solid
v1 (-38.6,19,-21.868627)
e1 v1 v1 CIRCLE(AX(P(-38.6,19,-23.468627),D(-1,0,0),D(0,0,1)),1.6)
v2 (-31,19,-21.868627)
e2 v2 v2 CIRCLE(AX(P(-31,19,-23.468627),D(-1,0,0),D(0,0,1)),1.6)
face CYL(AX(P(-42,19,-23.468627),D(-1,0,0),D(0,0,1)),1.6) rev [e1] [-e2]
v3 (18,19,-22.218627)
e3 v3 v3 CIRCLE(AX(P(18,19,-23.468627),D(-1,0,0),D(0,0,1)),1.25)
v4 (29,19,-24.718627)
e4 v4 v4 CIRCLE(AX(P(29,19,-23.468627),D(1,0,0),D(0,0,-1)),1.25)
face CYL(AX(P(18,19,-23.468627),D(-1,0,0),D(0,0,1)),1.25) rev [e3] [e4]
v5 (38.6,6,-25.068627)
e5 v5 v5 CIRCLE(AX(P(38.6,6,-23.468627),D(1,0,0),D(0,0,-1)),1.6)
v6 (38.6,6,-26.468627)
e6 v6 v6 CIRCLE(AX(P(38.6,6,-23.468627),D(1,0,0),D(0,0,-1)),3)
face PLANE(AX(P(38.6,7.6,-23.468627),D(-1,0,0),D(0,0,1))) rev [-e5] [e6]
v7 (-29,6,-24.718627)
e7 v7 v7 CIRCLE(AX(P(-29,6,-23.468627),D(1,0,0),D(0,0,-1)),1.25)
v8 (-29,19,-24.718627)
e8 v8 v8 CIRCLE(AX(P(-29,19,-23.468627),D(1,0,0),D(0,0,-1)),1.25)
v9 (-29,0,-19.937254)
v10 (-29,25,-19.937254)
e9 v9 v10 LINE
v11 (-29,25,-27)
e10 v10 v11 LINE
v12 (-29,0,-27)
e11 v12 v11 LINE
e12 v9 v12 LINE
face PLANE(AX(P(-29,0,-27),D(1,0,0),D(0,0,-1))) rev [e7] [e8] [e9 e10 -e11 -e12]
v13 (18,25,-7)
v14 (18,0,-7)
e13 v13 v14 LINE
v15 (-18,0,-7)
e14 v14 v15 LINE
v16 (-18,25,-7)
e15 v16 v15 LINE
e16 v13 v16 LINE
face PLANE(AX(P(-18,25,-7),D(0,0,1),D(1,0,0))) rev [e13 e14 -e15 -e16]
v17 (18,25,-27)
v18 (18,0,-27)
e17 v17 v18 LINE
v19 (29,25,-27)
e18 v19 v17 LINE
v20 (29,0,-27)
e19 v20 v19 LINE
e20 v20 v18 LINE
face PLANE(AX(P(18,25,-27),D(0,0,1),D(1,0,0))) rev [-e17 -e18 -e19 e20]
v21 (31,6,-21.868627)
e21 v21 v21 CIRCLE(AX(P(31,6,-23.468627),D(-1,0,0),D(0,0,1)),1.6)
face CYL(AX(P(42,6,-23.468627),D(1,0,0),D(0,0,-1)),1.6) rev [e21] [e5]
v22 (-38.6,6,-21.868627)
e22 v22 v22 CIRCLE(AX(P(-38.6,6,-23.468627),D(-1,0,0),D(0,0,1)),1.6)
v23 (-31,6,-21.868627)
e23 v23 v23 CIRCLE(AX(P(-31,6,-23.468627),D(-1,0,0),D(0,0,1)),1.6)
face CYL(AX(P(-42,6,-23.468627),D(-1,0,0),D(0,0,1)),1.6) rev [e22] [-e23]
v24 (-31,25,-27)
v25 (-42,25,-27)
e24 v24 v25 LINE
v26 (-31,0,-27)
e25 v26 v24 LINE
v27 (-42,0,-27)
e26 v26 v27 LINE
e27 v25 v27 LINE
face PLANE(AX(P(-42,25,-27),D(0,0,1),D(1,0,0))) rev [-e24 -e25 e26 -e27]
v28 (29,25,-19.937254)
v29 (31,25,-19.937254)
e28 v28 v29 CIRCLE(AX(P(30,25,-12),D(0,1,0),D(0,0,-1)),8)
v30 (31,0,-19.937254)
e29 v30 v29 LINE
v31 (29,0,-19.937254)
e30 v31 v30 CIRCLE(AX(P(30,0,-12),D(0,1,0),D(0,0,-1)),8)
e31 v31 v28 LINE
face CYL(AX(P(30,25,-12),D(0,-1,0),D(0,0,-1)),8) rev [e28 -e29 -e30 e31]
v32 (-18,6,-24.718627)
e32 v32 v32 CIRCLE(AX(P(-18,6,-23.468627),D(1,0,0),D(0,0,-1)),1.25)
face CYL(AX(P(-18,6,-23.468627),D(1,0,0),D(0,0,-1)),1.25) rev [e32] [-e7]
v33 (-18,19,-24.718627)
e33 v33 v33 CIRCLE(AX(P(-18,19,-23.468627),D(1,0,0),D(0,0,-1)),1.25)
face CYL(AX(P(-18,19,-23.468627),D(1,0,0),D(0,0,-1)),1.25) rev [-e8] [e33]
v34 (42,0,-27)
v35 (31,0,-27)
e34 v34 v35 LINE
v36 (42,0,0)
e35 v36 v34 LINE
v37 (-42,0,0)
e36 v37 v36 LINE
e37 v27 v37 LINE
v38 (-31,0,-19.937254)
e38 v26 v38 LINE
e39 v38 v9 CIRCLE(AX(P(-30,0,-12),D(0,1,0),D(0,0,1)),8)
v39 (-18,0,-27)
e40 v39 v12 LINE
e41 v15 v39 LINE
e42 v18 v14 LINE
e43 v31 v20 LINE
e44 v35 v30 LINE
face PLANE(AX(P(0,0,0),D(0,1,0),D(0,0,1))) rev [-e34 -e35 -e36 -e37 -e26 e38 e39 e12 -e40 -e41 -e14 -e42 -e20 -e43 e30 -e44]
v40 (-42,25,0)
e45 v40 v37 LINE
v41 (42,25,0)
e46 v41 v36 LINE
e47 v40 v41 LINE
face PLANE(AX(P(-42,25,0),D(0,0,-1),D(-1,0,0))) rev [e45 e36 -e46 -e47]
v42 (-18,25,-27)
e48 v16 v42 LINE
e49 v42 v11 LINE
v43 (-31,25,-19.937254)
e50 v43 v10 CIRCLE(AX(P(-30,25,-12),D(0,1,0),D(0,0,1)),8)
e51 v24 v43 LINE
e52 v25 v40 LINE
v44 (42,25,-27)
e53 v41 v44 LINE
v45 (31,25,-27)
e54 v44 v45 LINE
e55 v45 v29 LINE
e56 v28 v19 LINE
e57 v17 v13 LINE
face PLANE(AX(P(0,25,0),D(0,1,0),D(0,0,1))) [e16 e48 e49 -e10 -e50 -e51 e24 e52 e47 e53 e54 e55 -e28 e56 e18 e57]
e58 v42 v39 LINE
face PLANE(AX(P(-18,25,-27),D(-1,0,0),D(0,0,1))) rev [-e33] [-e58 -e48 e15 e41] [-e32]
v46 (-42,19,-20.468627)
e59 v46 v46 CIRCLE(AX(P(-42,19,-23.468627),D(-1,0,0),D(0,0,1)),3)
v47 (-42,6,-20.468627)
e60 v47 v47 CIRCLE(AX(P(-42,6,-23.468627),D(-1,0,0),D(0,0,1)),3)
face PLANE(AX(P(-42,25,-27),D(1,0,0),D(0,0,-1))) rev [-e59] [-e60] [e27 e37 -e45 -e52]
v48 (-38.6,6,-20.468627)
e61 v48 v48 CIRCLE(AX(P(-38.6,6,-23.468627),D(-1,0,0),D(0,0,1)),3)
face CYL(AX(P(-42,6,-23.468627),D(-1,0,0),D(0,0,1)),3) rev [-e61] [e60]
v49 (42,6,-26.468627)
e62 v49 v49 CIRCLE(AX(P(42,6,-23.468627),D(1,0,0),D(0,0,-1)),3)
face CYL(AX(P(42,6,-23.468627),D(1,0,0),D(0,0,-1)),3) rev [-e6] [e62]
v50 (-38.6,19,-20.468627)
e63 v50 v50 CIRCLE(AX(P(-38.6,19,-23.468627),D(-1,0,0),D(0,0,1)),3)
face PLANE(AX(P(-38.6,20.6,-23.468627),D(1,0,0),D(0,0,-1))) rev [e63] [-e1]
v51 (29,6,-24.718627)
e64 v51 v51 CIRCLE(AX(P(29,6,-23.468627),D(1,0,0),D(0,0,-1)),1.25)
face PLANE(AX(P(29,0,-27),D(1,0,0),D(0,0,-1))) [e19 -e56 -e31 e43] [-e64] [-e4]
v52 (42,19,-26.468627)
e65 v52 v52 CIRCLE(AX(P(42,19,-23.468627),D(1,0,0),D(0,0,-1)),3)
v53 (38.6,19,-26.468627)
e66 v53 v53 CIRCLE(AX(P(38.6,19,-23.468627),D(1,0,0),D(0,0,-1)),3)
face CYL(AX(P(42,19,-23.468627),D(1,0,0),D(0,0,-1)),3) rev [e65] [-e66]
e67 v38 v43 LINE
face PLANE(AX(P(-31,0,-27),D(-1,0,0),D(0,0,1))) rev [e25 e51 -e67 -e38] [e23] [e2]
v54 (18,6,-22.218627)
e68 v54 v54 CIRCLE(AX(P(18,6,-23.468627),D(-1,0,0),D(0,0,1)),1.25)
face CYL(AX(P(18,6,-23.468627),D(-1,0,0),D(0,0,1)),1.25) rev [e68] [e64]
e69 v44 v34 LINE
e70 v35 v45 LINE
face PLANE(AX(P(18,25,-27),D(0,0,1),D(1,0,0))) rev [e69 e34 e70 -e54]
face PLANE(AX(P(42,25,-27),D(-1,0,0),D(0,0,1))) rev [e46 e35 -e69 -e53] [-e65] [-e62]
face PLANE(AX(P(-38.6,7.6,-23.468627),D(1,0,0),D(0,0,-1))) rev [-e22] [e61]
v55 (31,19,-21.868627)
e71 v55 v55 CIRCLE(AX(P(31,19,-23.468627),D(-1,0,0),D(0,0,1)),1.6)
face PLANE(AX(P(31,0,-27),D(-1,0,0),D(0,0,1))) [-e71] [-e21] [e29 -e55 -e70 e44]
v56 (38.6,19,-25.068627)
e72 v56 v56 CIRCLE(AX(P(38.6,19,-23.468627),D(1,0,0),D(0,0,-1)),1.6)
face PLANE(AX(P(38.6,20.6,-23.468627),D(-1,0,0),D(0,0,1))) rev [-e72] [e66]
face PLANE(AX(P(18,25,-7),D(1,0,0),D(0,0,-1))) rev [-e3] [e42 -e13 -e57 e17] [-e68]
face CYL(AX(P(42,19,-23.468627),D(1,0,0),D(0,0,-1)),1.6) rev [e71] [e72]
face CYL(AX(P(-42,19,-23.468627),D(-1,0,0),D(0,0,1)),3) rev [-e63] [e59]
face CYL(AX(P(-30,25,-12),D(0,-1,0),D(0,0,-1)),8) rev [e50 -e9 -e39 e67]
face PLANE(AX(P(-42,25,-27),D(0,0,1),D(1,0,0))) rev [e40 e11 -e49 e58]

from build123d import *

# Parameters (mm, degrees)
SKETCH_1_R                = 8
EXTRUDE_1_DEPTH           = 25
SKETCH_2_W                = 2
SKETCH_2_H                = 7.062746067
CUT_EXTRUDE_1_DEPTH       = 56.839054433
HOLE_START                = -42
HOLE_WIZARD_1_OUTLINE_R   = 3
HOLE_WIZARD_1_DEPTH       = 3.4
HOLE_START_2              = -38.6
HOLE_WIZARD_1_2_OUTLINE_R = 1.6
HOLE_WIZARD_1_2_DEPTH     = 7.6
HOLE_WIZARD_M3_1_D        = 2.5
HOLE_WIZARD_M3_1_DEPTH    = 11.001


# Read off the part's stored shape, not the designer's step: 打孔尺寸(%根据)内六角圆柱头螺钉的类型1
with BuildPart() as part:
    # 草图1 → 凸台-拉伸1 (new body)
    with BuildSketch(Plane(origin=(0, 0, 0), x_dir=(1, 0, 0), z_dir=(0, 1, 0))):
        Polygon((-18, 27), (-18, 7), (18, 7), (18, 27), (42, 27), (42, 0), (-42, 0), (-42, 27), align=None)
        with Locations(Location((-30, 12, 0), (0, 0, 270))):
            Circle(SKETCH_1_R, mode=Mode.SUBTRACT)
        with Locations(Location((30, 12, 0), (0, 0, 90))):
            Circle(SKETCH_1_R, mode=Mode.SUBTRACT)
    extrude(amount=EXTRUDE_1_DEPTH)

    # 草图2 → 切除-拉伸1 (cut, through all)
    with BuildSketch(Plane(origin=(0, 25, 0), x_dir=(1, 0, 0), z_dir=(0, 1, 0))):
        with Locations((-30, 23.468626967)):
            Rectangle(SKETCH_2_W, SKETCH_2_H)
    cut_extrude_1 = extrude(amount=-CUT_EXTRUDE_1_DEPTH, mode=Mode.SUBTRACT)

    # 打孔尺寸(%根据)内六角圆柱头螺钉的类型1 outline → 打孔尺寸(%根据)内六角圆柱头螺钉的类型1 (cut)
    with BuildSketch(Plane.YZ.offset(HOLE_START)):
        with Locations((6, -23.468626967)):
            Circle(HOLE_WIZARD_1_OUTLINE_R)
        with Locations((19, -23.468626967)):
            Circle(HOLE_WIZARD_1_OUTLINE_R)
    hole_wizard_1 = extrude(amount=HOLE_WIZARD_1_DEPTH, mode=Mode.SUBTRACT)

    # Hole Wizard 1 2 outline → Hole Wizard 1 2 (cut)
    with BuildSketch(Plane.YZ.offset(HOLE_START_2)):
        with Locations((6, -23.468626967)):
            Circle(HOLE_WIZARD_1_2_OUTLINE_R)
        with Locations((19, -23.468626967)):
            Circle(HOLE_WIZARD_1_2_OUTLINE_R)
    hole_wizard_1_2 = extrude(amount=HOLE_WIZARD_1_2_DEPTH, mode=Mode.SUBTRACT)

    # M3 螺纹孔1
    with Locations(Plane(origin=(-18, 0, 0), x_dir=(0, 0, -1), z_dir=(1, 0, 0))):
        with Locations((23.468626967, 19), (23.468626967, 6)):
            hole_wizard_m3_1 = Hole(HOLE_WIZARD_M3_1_D / 2, depth=HOLE_WIZARD_M3_1_DEPTH)

    # 镜向1: 切除-拉伸1, 打孔尺寸(%根据)内六角圆柱头螺钉的类型1, Hole Wizard 1 2, M3 螺纹孔1 across plane
    add(cut_extrude_1.mirror(Plane(origin=(0, 0, 0), x_dir=(0, 0, 1), z_dir=(1, 0, 0))), mode=Mode.SUBTRACT)
    add(hole_wizard_1.mirror(Plane(origin=(0, 0, 0), x_dir=(0, 0, 1), z_dir=(1, 0, 0))), mode=Mode.SUBTRACT)
    add(hole_wizard_1_2.mirror(Plane(origin=(0, 0, 0), x_dir=(0, 0, 1), z_dir=(1, 0, 0))), mode=Mode.SUBTRACT)
    add(hole_wizard_m3_1.mirror(Plane(origin=(0, 0, 0), x_dir=(0, 0, 1), z_dir=(1, 0, 0))), mode=Mode.SUBTRACT)


solid = part.part
